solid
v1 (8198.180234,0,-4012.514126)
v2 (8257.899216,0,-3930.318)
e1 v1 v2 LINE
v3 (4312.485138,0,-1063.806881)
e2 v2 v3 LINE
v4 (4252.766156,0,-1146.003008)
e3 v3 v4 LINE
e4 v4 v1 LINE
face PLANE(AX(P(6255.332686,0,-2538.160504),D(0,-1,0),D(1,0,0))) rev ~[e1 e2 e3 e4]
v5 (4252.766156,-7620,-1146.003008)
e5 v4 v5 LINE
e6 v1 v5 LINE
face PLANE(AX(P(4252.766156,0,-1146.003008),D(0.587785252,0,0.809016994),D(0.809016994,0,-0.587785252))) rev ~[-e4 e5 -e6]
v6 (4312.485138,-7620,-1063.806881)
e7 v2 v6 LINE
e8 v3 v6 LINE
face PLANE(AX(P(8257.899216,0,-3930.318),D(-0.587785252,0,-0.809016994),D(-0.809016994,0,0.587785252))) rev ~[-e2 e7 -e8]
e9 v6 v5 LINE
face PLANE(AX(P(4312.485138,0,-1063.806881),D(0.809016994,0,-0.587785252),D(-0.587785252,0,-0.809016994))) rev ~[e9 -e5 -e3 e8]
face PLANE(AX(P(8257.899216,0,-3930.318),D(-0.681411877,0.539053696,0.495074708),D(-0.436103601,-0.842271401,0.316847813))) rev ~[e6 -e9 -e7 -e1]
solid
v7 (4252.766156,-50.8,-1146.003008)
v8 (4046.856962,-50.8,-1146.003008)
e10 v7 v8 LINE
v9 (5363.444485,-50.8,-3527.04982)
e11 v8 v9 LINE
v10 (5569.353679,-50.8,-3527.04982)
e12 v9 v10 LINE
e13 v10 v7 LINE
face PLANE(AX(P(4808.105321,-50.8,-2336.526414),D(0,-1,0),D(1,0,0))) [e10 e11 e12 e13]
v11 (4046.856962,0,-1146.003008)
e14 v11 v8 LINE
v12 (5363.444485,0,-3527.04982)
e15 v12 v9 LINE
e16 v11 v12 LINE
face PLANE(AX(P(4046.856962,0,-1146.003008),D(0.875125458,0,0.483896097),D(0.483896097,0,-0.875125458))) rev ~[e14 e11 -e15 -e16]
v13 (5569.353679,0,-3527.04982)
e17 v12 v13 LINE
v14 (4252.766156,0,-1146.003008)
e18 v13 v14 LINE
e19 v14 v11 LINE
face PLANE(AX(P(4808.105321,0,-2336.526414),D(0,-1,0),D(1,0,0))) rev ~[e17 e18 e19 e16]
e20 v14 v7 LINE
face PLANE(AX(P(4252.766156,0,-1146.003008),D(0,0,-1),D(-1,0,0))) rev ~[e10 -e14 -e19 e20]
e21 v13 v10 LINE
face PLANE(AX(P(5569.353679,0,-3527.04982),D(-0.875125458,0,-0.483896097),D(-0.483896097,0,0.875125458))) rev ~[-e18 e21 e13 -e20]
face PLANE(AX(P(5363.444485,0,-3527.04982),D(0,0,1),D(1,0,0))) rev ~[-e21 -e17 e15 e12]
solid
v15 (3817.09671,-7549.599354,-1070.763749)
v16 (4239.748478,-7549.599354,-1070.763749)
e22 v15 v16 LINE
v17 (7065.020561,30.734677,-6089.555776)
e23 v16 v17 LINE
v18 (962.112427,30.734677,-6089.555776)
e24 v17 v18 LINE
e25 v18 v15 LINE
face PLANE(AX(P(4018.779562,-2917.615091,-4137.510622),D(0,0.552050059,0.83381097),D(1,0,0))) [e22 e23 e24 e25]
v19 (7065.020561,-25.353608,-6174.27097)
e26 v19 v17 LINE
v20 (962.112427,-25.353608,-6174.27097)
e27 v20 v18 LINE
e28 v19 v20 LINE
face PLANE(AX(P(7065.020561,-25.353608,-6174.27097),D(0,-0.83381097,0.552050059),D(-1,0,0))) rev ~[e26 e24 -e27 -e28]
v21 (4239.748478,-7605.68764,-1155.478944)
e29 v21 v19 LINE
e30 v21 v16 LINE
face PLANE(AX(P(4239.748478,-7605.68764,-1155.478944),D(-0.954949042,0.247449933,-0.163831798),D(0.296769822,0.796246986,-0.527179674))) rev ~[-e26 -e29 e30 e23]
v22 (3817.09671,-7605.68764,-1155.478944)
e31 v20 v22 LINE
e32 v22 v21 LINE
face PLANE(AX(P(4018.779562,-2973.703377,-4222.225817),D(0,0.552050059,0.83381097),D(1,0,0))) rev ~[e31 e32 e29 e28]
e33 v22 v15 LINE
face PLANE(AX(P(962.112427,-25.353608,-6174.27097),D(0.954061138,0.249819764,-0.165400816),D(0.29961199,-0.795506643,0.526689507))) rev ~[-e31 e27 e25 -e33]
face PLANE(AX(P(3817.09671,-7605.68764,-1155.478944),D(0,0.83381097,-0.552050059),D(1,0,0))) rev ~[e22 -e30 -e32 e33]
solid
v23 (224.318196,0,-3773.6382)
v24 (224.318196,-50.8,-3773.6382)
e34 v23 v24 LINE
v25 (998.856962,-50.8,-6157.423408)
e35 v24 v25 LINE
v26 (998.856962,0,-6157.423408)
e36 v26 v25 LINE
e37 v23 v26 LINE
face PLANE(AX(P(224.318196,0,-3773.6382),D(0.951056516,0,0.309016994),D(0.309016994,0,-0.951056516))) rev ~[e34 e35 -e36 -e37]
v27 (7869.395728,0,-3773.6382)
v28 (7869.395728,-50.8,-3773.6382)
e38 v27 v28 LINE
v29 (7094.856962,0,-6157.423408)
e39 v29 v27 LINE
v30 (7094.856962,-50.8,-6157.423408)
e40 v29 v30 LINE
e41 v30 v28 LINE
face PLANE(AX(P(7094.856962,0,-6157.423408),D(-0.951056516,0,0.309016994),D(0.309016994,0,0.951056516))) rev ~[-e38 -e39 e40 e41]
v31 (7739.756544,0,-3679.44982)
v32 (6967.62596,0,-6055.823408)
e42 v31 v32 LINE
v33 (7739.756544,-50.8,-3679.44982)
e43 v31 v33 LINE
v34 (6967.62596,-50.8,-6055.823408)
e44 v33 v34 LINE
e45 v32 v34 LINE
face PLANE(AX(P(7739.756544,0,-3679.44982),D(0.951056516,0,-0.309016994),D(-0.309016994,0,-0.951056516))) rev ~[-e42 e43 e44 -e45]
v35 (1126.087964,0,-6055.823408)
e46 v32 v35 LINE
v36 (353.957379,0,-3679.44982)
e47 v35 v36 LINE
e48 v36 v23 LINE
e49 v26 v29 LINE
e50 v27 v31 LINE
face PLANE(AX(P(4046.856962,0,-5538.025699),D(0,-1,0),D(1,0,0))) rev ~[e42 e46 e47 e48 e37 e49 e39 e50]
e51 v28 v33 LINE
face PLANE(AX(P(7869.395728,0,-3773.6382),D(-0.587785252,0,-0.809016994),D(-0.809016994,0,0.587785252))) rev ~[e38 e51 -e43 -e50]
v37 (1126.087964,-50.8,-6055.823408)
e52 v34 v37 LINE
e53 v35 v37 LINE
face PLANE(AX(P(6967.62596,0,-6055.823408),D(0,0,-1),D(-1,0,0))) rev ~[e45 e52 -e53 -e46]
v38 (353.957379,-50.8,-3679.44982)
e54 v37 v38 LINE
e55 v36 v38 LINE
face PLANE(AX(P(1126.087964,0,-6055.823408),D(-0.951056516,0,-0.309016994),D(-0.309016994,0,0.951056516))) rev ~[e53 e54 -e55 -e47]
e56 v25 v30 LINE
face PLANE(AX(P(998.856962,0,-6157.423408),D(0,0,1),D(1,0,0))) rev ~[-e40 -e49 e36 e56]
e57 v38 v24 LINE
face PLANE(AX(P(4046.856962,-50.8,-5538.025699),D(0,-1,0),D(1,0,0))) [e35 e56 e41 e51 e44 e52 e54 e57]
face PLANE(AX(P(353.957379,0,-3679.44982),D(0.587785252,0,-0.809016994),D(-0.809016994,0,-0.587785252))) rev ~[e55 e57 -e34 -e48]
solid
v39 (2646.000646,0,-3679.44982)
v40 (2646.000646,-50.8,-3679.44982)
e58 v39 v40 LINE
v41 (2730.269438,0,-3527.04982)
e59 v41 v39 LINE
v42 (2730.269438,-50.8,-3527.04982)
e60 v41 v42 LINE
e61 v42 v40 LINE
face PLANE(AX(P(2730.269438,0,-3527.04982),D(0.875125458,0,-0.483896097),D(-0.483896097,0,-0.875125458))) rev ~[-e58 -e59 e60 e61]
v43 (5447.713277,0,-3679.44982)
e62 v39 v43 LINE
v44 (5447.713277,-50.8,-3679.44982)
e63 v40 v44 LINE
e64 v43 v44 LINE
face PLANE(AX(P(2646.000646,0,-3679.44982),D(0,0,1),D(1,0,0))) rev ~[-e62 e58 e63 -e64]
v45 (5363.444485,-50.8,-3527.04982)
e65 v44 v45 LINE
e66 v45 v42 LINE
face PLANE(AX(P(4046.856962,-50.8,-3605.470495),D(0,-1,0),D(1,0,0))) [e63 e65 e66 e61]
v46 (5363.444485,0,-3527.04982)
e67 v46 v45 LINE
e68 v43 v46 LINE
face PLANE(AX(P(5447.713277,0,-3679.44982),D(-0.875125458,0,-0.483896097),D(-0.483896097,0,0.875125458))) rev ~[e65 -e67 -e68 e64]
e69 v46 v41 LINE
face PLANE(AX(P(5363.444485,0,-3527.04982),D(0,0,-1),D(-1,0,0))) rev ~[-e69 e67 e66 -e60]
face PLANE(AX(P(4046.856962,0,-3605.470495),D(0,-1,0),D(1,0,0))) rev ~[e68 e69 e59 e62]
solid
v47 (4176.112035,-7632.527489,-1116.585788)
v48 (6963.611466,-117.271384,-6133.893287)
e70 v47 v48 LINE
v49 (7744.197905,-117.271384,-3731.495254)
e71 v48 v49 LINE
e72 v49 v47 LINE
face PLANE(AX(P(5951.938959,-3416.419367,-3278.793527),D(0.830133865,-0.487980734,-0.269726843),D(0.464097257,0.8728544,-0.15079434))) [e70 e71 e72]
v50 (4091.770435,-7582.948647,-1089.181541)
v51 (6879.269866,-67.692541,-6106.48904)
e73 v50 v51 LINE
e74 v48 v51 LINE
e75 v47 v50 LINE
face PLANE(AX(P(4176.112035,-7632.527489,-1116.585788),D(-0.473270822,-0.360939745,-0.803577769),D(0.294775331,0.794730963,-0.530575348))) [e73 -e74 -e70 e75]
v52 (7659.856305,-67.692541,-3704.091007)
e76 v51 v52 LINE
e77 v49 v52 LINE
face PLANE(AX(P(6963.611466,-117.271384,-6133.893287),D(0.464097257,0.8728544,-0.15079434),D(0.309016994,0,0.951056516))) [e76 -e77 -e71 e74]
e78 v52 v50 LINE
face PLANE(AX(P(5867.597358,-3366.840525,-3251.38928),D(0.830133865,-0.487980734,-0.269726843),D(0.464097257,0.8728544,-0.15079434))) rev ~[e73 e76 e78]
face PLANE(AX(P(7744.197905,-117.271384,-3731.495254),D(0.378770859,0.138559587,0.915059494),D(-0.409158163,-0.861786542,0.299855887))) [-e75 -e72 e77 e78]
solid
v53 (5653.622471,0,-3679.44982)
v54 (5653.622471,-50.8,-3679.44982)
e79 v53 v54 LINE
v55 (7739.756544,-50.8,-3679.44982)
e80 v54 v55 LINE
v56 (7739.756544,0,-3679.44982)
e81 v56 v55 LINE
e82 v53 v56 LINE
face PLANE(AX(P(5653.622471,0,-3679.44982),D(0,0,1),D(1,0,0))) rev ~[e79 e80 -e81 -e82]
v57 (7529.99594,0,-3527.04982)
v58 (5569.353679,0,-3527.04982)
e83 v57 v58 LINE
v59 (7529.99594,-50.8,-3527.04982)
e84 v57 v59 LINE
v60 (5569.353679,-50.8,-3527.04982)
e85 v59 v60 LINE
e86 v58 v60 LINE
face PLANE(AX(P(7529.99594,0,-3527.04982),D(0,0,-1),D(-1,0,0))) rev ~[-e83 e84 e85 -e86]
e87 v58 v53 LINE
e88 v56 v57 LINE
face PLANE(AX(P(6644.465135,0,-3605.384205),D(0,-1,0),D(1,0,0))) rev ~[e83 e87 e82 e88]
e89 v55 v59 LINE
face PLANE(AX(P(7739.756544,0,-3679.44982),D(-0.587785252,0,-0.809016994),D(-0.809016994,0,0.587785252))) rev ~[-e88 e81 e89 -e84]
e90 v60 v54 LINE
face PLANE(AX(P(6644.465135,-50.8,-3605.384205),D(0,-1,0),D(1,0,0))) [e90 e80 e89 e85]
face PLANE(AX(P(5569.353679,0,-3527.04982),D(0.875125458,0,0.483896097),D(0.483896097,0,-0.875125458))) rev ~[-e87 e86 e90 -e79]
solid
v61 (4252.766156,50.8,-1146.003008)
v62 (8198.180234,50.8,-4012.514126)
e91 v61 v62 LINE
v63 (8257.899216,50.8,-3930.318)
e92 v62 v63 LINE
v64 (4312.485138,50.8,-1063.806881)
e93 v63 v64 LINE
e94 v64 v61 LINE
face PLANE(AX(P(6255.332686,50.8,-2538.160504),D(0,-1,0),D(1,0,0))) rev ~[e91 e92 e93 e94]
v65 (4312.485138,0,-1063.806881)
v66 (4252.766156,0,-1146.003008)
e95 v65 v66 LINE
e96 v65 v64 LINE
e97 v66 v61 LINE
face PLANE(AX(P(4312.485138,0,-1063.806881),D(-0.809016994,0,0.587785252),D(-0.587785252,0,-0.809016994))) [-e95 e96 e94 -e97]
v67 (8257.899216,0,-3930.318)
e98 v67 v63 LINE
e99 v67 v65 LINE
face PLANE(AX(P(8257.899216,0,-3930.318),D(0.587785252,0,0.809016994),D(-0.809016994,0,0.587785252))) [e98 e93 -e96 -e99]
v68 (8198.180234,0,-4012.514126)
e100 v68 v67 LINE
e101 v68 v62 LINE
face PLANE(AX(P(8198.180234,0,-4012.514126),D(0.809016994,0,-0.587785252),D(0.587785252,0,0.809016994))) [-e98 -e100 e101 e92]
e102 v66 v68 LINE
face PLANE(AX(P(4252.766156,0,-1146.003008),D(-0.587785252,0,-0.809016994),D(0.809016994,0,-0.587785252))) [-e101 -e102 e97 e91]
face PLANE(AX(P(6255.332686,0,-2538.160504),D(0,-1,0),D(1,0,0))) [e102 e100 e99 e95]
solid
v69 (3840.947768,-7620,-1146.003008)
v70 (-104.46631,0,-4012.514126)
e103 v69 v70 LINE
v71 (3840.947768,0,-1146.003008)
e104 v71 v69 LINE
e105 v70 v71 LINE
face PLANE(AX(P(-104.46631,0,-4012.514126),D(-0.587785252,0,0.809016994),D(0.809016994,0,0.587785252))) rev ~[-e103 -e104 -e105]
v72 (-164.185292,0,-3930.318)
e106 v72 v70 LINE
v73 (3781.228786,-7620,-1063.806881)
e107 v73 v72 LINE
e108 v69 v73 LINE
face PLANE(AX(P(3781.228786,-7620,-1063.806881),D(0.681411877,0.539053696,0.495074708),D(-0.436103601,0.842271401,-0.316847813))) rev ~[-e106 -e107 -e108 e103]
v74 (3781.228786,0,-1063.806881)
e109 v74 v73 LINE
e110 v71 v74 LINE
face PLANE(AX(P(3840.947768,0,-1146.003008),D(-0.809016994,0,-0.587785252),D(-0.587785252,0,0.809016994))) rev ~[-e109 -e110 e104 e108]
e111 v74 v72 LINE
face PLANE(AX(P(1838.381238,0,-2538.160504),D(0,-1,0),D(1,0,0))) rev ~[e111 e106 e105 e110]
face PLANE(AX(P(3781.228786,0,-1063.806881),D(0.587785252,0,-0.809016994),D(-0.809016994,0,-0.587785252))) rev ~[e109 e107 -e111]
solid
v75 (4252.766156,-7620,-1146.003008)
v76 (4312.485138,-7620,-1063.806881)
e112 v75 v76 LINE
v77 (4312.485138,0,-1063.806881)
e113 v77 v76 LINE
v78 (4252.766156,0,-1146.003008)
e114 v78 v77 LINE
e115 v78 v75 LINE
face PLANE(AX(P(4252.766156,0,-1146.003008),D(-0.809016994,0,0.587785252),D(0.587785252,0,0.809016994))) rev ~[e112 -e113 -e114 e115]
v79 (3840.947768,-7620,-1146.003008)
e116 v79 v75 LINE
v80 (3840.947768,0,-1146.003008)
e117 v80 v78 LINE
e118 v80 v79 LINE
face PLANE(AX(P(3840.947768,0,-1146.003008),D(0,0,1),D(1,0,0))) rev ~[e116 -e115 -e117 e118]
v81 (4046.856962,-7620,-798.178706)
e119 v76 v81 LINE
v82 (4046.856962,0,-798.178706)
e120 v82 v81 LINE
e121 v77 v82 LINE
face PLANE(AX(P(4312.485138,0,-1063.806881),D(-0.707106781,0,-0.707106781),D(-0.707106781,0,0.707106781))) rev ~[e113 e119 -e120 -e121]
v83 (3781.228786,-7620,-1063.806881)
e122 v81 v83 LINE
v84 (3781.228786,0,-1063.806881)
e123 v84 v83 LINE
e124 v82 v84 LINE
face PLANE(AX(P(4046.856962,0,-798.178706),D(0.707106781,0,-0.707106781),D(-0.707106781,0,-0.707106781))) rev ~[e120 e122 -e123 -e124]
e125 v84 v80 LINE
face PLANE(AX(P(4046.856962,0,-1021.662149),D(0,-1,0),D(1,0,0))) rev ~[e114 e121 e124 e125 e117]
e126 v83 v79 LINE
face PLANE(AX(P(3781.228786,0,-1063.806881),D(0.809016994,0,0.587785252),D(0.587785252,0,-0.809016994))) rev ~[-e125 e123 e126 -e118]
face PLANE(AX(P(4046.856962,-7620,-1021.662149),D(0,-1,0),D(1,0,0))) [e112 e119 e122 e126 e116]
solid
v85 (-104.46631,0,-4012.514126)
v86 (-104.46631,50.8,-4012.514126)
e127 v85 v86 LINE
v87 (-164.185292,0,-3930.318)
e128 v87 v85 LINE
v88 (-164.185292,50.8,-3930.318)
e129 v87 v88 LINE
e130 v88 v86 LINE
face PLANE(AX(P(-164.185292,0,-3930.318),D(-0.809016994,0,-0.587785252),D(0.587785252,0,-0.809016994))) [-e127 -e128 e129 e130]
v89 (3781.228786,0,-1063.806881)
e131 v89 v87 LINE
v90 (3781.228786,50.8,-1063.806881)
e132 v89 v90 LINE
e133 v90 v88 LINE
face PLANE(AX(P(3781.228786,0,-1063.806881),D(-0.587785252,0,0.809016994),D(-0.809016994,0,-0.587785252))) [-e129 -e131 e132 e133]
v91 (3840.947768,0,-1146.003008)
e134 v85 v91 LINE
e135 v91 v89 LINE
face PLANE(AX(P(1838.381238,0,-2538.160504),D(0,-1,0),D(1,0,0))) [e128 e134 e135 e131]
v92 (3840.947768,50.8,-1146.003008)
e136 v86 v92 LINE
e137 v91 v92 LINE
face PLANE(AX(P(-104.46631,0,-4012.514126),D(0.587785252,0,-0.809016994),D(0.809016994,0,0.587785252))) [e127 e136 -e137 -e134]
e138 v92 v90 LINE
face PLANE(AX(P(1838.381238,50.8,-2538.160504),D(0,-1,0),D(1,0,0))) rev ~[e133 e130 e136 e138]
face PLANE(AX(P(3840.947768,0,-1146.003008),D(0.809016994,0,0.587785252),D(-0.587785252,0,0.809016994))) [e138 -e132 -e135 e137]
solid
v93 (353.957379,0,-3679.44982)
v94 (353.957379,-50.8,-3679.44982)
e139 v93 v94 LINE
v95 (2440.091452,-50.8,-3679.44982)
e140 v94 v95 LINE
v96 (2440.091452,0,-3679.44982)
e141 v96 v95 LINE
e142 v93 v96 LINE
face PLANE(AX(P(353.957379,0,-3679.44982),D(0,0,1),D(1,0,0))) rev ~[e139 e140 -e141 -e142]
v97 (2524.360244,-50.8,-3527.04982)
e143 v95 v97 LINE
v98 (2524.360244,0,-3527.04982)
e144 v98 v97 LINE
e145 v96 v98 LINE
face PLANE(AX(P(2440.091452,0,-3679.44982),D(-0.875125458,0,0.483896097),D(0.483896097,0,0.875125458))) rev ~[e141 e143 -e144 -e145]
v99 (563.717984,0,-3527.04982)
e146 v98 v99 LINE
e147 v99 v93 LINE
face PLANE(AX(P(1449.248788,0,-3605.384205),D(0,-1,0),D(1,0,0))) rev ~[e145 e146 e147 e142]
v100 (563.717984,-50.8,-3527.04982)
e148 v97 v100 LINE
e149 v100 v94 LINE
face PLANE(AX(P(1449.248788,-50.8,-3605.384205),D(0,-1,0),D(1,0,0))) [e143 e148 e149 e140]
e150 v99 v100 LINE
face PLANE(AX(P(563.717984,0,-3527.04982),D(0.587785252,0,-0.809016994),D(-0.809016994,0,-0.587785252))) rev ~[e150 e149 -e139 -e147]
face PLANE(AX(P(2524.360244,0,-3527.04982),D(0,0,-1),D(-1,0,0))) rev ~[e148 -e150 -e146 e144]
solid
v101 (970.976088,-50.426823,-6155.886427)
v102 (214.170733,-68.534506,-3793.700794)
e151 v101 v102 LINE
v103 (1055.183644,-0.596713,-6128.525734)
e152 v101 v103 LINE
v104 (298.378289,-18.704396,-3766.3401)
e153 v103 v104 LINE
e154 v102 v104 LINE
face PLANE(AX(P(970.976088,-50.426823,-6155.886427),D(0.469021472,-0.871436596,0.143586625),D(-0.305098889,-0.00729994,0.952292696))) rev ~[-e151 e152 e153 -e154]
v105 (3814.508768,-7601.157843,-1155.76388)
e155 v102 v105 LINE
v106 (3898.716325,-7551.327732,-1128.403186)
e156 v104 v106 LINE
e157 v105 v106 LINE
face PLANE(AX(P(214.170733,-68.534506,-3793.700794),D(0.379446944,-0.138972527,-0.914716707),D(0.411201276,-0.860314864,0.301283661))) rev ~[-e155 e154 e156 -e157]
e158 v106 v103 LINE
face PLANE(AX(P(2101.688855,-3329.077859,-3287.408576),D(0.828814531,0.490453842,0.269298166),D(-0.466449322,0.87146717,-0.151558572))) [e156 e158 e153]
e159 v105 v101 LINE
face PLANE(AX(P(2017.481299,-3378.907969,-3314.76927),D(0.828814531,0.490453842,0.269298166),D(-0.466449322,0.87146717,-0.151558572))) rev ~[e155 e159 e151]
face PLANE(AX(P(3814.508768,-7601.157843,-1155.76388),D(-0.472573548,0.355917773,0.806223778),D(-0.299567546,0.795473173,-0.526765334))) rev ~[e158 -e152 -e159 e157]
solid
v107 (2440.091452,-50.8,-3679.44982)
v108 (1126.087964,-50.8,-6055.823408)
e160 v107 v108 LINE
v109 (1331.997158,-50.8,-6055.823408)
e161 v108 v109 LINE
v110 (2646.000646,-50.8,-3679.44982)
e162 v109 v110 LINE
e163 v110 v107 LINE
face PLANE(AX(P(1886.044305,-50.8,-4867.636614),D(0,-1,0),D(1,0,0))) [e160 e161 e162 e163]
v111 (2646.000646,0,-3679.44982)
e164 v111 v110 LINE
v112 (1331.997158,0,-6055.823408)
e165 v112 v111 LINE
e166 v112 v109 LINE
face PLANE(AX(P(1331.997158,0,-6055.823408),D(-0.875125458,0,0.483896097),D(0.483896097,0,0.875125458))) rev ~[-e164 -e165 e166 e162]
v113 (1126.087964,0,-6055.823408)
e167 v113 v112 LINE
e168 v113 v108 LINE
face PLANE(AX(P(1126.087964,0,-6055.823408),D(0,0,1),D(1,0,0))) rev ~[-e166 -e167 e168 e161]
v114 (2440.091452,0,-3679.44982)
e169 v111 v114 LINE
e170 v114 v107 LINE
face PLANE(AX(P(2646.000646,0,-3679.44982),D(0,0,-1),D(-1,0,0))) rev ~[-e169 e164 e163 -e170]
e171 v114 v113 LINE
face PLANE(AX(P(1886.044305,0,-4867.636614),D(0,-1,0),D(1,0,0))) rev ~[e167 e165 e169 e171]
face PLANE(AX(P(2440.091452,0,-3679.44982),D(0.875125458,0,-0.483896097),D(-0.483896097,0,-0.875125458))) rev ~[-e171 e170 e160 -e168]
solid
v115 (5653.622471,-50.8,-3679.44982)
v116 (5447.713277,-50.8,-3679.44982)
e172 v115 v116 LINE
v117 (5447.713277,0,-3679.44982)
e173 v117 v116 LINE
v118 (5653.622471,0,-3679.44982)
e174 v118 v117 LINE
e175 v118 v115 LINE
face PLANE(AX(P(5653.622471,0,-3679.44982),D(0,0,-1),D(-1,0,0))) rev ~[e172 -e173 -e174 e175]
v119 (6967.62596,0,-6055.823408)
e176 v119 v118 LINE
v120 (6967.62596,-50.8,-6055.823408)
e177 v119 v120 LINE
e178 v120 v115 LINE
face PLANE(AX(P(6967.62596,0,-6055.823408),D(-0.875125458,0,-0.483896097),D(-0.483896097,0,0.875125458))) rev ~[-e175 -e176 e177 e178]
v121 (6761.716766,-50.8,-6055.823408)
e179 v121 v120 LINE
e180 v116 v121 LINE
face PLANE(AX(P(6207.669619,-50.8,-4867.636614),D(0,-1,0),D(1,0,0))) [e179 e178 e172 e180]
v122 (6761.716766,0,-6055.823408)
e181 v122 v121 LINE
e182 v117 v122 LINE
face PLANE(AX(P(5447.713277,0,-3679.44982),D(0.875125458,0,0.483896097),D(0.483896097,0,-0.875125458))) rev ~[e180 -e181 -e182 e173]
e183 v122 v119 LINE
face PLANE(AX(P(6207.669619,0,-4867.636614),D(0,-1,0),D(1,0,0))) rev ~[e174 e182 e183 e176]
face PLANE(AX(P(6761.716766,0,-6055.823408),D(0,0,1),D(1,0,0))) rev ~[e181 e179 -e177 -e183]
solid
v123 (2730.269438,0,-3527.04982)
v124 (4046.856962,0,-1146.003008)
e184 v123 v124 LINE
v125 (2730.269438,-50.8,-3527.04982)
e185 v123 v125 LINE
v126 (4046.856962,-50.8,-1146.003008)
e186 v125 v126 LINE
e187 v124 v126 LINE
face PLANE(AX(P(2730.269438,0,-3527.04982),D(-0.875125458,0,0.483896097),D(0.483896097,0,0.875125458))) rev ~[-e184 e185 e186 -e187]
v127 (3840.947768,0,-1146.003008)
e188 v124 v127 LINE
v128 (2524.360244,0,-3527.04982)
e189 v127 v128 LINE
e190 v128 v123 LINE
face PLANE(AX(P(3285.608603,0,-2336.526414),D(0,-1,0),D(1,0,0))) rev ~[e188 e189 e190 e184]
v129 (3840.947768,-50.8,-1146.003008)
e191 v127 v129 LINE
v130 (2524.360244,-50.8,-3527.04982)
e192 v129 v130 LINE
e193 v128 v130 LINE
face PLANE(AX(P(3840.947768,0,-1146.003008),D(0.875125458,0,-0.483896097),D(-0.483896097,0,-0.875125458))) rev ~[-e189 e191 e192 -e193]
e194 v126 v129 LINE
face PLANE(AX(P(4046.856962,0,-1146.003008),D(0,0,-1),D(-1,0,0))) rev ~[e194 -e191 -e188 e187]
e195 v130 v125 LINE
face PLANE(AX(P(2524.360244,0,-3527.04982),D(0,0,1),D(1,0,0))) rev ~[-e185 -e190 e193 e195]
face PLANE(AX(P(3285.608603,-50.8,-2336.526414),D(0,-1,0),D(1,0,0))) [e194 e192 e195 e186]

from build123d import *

# Parameters (mm, degrees)
F1_DEPTH  = 50.8
F2_DEPTH  = 7620
F4_DEPTH  = 5016.876130589
F6_DEPTH  = 5016.876130589
F7_DEPTH  = 50.8
F8_DEPTH  = 50.8
F9_DEPTH  = 50.8
F10_DEPTH = 50.8
F13_DEPTH = 101.6
F16_DEPTH = 101.6
F19_DEPTH = 101.6
F20_DEPTH = 7620


# Not quite as in the source:
# - a feature names something its author has since deleted; it is built from what else it names


with BuildPart() as f1:
    # F0 (on Front) → F1 (new body)
    with BuildSketch(Plane.XZ):
        Polygon((3781.2287860666, -1063.8068812603), (-164.1852921012, -3930.3179996402), (-104.4663104683, -4012.5141262687), (224.3181960457, -3773.6381997371), (353.9573792386, -3679.4498198516), (563.7179839184, -3527.0498198516), (3840.9477676995, -1146.0030078888), align=None)
    extrude(amount=-F1_DEPTH)


with BuildPart() as f1b:
    # F0 (on Front) → F1, piece 2 (new body)
    with BuildSketch(Plane.XZ):
        Polygon((8257.8992157481, -3930.3179996402), (4312.4851375803, -1063.8068812603), (4252.7661559474, -1146.0030078888), (7529.9959397285, -3527.0498198516), (7739.7565444083, -3679.4498198516), (7869.3957276012, -3773.6381997371), (8198.1802341152, -4012.5141262687), align=None)
    extrude(amount=-F1_DEPTH)


with BuildPart() as f2:
    # F0 (on Front) → F2 (new body)
    with BuildSketch(Plane.XZ):
        Polygon((8257.8992157481, -3930.3179996402), (4312.4851375803, -1063.8068812603), (4252.7661559474, -1146.0030078888), (7529.9959397285, -3527.0498198516), (7739.7565444083, -3679.4498198516), (7869.3957276012, -3773.6381997371), (8198.1802341152, -4012.5141262687), align=None)
    extrude(amount=F2_DEPTH)

    # F3 (on face) → F4 (cut, through all)
    with BuildSketch(Plane(origin=(984.0567377882, 0, 1354.4379026095), x_dir=(0.8090169944, 0, -0.5877852523), z_dir=(0.5877852523, 0, 0.8090169944))):
        Polygon((8990.9637603839, 0), (4114.1637603839, -7620), (8990.9637603839, -7620), align=None)
    extrude(amount=-F4_DEPTH, mode=Mode.SUBTRACT)


with BuildPart() as f2b:
    # F0 (on Front) → F2, piece 2 (new body)
    with BuildSketch(Plane.XZ):
        Polygon((3781.2287860666, -1063.8068812603), (-164.1852921012, -3930.3179996402), (-104.4663104683, -4012.5141262687), (224.3181960457, -3773.6381997371), (353.9573792386, -3679.4498198516), (563.7179839184, -3527.0498198516), (3840.9477676995, -1146.0030078888), align=None)
    extrude(amount=F2_DEPTH)

    # F5 (on face) → F6 (cut, through all)
    with BuildSketch(Plane(origin=(1812.2526490272, 0, -2494.3517814471), x_dir=(0.8090169944, 0, 0.5877852523), z_dir=(-0.5877852523, 0, 0.8090169944))):
        Polygon((-2443.0116485444, -7620), (2433.7883514556, -7620), (-2443.0116485444, 0), align=None)
    extrude(amount=-F6_DEPTH, mode=Mode.SUBTRACT)


with BuildPart() as f7:
    # F0 (on Front) → F7 (new body)
    with BuildSketch(Plane.XZ):
        Polygon((4252.7661559474, -1146.0030078888), (4046.8569618235, -1146.0030078888), (5363.4444852873, -3527.0498198516), (5569.3536794113, -3527.0498198516), align=None)
    extrude(amount=F7_DEPTH)


with BuildPart() as f7b:
    # F0 (on Front) → F7, piece 2 (new body)
    with BuildSketch(Plane.XZ):
        Polygon((4046.8569618235, -1146.0030078888), (3840.9477676995, -1146.0030078888), (2524.3602442356, -3527.0498198516), (2730.2694383596, -3527.0498198516), align=None)
    extrude(amount=F7_DEPTH)


with BuildPart() as f8:
    # F0 (on Front) → F8 (new body)
    with BuildSketch(Plane.XZ):
        Polygon((353.9573792386, -3679.4498198516), (224.3181960457, -3773.6381997371), (998.8569618235, -6157.4234080753), (7094.8569618235, -6157.4234080753), (7869.3957276012, -3773.6381997371), (7739.7565444083, -3679.4498198516), (6967.6259599868, -6055.8234080753), (6761.7167658628, -6055.8234080753), (1331.9971577841, -6055.8234080753), (1126.0879636601, -6055.8234080753), align=None)
    extrude(amount=F8_DEPTH)


with BuildPart() as f9:
    # F0 (on Front) → F9 (new body)
    with BuildSketch(Plane.XZ):
        Polygon((5653.6224714266, -3679.4498198516), (5447.7132773026, -3679.4498198516), (6761.7167658628, -6055.8234080753), (6967.6259599868, -6055.8234080753), align=None)
    extrude(amount=F9_DEPTH)


with BuildPart() as f9b:
    # F0 (on Front) → F9, piece 2 (new body)
    with BuildSketch(Plane.XZ):
        Polygon((7739.7565444083, -3679.4498198516), (7529.9959397285, -3527.0498198516), (5569.3536794113, -3527.0498198516), (5653.6224714266, -3679.4498198516), align=None)
    extrude(amount=F9_DEPTH)


with BuildPart() as f9c:
    # F0 (on Front) → F9, piece 3 (new body)
    with BuildSketch(Plane.XZ):
        Polygon((2524.3602442356, -3527.0498198516), (563.7179839184, -3527.0498198516), (353.9573792386, -3679.4498198516), (2440.0914522204, -3679.4498198516), align=None)
    extrude(amount=F9_DEPTH)


with BuildPart() as f9d:
    # F0 (on Front) → F9, piece 4 (new body)
    with BuildSketch(Plane.XZ):
        Polygon((2646.0006463443, -3679.4498198516), (2440.0914522204, -3679.4498198516), (1126.0879636601, -6055.8234080753), (1331.9971577841, -6055.8234080753), align=None)
    extrude(amount=F9_DEPTH)


with BuildPart() as f10:
    # F0 (on Front) → F10 (new body)
    with BuildSketch(Plane.XZ):
        Polygon((5363.4444852873, -3527.0498198516), (2730.2694383596, -3527.0498198516), (2646.0006463443, -3679.4498198516), (5447.7132773026, -3679.4498198516), align=None)
    extrude(amount=F10_DEPTH)


with BuildPart() as f13:
    # F12 (on 3pt) → F13 (new body)
    with BuildSketch(Plane(origin=(0, -2849.7769817203, -4304.2750772285), x_dir=(1, 0, 0), z_dir=(0, 0.5520500585, 0.8338109695))):
        Polygon((4239.7484779358, -5703.8235664368), (7065.0205612183, 3387.3665332794), (962.1124267578, 3387.3665332794), (3817.0967102051, -5703.8235664368), align=None)
    extrude(amount=F13_DEPTH)


with BuildPart() as f16:
    # F15 (on face) → F16 (new body)
    with BuildSketch(Plane(origin=(6219.7211580064, -3656.1622452923, -2020.9099093128), x_dir=(0.4640972567, 0.8728543999, -0.1507943397), z_dir=(0.8301338648, -0.4879807338, -0.2697268432))):
        Polygon((4054.3885231018, -1155.7741165161), (-4555.5882453918, 228.5533994436), (4054.3885231018, -3681.804895401), align=None)
    extrude(amount=-F16_DEPTH)


with BuildPart() as f19:
    # F18 (on face) → F19 (new body)
    with BuildSketch(Plane(origin=(-727.4852094478, -430.4918680103, -236.3742732677), x_dir=(-0.4664493221, 0.8714671704, -0.151558572), z_dir=(0.8288145312, 0.4904538417, 0.2692981657))):
        Polygon((-8228.2686233521, -2277.9448032379), (436.1208975315, -6154.6440124512), (415.3425097466, -3674.2062568665), align=None)
    extrude(amount=F19_DEPTH)


with BuildPart() as f20:
    # F0 (on Front) → F20 (new body)
    with BuildSketch(Plane.XZ):
        Polygon((4046.8569618235, -798.1787055034), (3781.2287860666, -1063.8068812603), (3840.9477676995, -1146.0030078888), (4046.8569618235, -1146.0030078888), (4252.7661559474, -1146.0030078888), (4312.4851375803, -1063.8068812603), align=None)
    extrude(amount=F20_DEPTH)


solid = Compound([f1.part, f1b.part, f2.part, f2b.part, f7.part, f7b.part, f8.part, f9.part, f9b.part, f9c.part, f9d.part, f10.part, f13.part, f16.part, f19.part, f20.part])
